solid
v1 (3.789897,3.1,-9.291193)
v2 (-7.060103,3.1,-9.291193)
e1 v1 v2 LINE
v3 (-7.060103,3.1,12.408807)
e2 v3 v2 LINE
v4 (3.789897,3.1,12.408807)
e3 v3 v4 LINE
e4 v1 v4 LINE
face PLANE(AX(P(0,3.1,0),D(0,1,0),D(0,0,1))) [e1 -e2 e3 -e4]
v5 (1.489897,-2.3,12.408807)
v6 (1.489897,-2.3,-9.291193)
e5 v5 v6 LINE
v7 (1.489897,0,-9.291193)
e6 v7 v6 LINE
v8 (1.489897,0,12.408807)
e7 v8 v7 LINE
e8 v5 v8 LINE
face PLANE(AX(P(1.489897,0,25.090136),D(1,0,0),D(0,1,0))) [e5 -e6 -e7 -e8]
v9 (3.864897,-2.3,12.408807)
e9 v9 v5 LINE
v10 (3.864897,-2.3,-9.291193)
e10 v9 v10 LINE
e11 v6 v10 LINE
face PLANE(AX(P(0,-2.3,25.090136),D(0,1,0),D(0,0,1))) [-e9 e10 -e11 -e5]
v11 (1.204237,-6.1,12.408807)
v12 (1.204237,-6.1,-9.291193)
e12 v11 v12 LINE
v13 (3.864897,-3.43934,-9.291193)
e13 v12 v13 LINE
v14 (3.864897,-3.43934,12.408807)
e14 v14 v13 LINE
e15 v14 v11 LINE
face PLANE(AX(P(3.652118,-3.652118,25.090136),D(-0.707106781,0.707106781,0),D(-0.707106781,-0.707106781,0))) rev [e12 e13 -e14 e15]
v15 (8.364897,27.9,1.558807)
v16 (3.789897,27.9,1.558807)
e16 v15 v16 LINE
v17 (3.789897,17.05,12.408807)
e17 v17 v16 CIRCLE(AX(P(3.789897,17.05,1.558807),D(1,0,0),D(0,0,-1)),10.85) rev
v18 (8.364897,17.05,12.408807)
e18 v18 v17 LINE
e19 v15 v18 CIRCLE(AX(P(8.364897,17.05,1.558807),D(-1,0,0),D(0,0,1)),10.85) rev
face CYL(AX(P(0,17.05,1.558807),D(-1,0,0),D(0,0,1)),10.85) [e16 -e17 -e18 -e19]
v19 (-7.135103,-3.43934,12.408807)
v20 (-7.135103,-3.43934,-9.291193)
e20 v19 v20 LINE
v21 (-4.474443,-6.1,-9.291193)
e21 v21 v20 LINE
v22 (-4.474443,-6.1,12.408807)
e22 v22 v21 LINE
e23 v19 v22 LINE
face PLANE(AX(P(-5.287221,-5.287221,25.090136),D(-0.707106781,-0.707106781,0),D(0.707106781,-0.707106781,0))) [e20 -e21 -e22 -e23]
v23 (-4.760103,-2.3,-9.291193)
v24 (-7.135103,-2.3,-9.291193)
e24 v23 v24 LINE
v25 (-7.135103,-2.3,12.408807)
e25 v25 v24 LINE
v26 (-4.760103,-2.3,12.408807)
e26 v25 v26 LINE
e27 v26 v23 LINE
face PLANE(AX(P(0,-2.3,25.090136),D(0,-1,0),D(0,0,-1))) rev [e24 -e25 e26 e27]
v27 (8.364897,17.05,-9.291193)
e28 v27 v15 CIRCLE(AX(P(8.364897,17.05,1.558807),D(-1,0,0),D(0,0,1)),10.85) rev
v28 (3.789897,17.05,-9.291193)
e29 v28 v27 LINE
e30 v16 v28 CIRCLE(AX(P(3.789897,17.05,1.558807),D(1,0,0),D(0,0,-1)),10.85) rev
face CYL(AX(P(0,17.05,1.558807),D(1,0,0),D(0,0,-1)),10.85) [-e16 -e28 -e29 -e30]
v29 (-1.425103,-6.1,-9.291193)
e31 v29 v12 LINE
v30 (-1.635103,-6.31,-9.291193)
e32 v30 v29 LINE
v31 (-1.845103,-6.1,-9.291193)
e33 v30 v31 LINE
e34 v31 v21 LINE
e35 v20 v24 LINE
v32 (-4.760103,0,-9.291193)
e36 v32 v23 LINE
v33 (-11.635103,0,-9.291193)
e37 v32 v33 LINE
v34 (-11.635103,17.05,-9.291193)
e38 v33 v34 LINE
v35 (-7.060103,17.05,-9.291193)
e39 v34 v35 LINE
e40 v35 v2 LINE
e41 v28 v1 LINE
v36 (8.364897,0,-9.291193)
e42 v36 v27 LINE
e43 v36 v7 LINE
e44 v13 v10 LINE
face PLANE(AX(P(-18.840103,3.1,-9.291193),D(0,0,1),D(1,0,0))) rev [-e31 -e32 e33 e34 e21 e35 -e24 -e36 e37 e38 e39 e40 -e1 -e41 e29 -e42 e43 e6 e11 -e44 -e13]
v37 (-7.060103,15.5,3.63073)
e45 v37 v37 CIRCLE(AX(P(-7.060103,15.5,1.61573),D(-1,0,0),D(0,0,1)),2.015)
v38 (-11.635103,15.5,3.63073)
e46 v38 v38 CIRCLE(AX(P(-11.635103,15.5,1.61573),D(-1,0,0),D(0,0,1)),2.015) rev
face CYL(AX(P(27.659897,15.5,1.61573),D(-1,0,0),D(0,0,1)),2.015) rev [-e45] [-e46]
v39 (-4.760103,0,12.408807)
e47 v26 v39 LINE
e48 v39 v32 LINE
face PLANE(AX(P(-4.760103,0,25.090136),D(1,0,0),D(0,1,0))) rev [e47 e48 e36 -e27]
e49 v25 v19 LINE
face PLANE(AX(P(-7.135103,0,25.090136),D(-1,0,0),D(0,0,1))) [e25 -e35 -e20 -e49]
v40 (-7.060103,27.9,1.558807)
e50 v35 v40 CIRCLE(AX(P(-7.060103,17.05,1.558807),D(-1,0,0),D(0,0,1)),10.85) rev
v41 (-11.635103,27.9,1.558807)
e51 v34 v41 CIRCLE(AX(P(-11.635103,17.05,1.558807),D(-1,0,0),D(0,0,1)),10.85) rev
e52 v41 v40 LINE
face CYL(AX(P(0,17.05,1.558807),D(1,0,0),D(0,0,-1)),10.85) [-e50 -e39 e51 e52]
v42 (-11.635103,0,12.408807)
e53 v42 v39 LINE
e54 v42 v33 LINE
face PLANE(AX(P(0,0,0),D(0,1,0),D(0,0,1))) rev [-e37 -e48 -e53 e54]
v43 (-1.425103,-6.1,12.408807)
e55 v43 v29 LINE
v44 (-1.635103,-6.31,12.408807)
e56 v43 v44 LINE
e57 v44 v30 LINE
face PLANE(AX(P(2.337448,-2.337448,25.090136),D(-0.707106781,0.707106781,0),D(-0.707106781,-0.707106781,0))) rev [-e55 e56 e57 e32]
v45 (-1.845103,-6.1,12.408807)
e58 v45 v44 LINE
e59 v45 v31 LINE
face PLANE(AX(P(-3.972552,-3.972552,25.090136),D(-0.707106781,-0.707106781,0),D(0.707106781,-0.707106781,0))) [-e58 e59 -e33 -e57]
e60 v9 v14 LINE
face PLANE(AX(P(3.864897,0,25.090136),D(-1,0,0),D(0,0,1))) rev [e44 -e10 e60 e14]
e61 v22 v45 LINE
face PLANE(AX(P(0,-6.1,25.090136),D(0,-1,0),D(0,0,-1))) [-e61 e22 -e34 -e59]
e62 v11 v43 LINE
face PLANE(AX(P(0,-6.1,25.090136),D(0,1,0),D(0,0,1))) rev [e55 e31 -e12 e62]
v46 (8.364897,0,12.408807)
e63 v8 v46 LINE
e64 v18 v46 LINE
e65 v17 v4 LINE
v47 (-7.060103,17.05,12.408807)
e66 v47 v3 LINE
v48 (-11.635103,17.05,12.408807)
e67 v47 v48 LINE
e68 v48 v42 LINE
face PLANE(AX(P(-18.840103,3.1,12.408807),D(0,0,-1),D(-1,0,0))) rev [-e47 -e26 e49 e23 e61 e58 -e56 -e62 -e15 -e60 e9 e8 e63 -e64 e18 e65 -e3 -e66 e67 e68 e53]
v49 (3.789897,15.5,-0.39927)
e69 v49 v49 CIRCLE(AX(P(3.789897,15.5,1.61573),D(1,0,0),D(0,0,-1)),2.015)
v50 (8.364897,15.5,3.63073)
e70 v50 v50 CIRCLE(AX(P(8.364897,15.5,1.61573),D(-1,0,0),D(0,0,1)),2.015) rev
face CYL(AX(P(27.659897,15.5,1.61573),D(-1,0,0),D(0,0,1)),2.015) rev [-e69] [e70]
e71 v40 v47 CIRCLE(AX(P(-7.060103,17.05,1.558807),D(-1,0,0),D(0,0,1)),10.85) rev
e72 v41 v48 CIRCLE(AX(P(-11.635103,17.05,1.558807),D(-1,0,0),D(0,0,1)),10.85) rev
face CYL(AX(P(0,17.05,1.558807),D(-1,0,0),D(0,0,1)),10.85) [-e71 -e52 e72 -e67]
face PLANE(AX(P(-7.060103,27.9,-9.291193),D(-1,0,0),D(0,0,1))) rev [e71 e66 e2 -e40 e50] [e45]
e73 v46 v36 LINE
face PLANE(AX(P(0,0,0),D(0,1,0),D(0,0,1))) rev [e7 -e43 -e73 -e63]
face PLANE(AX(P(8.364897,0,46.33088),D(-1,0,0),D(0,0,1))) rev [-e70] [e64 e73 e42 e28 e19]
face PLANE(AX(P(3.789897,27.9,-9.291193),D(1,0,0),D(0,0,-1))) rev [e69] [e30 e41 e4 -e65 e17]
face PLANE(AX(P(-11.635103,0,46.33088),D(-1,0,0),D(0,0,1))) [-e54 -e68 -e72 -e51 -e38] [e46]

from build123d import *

# Parameters (mm, degrees)
SKETCH1_W           = 150
SKETCH1_H           = 70
BOSS_EXTRUDE1_DEPTH = 10
SKETCH2_W           = 18
SKETCH2_H           = 70
BOSS_EXTRUDE2_DEPTH = 80
FILLET1_R           = 35
SKETCH3_R           = 6.5
CUT_EXTRUDE1_DEPTH  = 164.102034121
RIB1_REACH          = 134.904
SKETCH5_WALL_W      = 321.142477346
SKETCH5_WALL_H      = 40
SKETCH7_W           = 43.830511012
SKETCH7_H           = 10.028409091
CUT_EXTRUDE2_DEPTH  = 80
SCALE1_SCALE        = 0.31
BOSS_EXTRUDE4_DEPTH = 21.7
CUT_EXTRUDE5_REACH  = 46.882
SKETCH11_W          = 1.005
SKETCH11_H          = 10.85
SKETCH11_H_2        = 13.95


with BuildPart() as part:
    # Sketch1 → Boss-Extrude1 (new body)
    with BuildSketch(Plane(origin=(0, 0, 0), x_dir=(1, 0, 0), z_dir=(0, 1, 0))):
        with Locations((14.225473782, -5.028409091)):
            Rectangle(SKETCH1_W, SKETCH1_H)
    extrude(amount=BOSS_EXTRUDE1_DEPTH)

    # Sketch2 → Boss-Extrude2 (add)
    with BuildSketch(Plane(origin=(0, 10, 0), x_dir=(1, 0, 0), z_dir=(0, 1, 0))):
        with Locations((-31.774526218, -5.028409091)):
            Rectangle(SKETCH2_W, SKETCH2_H)
        with Locations((21.225473782, -5.028409091)):
            Rectangle(SKETCH2_W, SKETCH2_H)
    extrude(amount=BOSS_EXTRUDE2_DEPTH)

    # Fillet1
    fillet1_edges = [part.edges().sort_by_distance(p)[0] for p in [
        (21.225473782, 90, 40.028409091),
        (21.225473782, 90, -29.971590909),
        (-31.774526218, 90, -29.971590909),
        (-31.774526218, 90, 40.028409091),
    ]]
    fillet(fillet1_edges, radius=FILLET1_R - 0.0001)  # a hair under: the kernel refuses the full size

    # Sketch3 → Cut-Extrude1 (cut, through all)
    with BuildSketch(Plane.ZY.offset(40.774526218)):
        with Locations((5.212032143, 50)):
            Circle(SKETCH3_R)
    extrude(amount=-CUT_EXTRUDE1_DEPTH, mode=Mode.SUBTRACT)

    # Sketch5 wall → Rib1 (add, up to next)
    with BuildSketch(Plane(origin=(52.140729288, 25.194278726, 0), x_dir=(0.821802771323, -0.569772064116, 0), z_dir=(0.569772064116, 0.821802771323, 0)), mode=Mode.PRIVATE) as rib1_sk1:
        Rectangle(SKETCH5_WALL_W, SKETCH5_WALL_H)
    rib1_tool1 = extrude(rib1_sk1.sketch, amount=-RIB1_REACH, mode=Mode.PRIVATE) - part.part
    add(rib1_tool1.solids().sort_by_distance((52.140729288, 25.194278726, 0))[0])

    # Sketch7 → Cut-Extrude2 (cut)
    with BuildSketch(Plane(origin=(0, 10, 0), x_dir=(1, 0, 0), z_dir=(0, 1, 0))):
        with Locations((52.140729288, 14.985795454)):
            Rectangle(SKETCH7_W, SKETCH7_H)
    extrude(amount=CUT_EXTRUDE2_DEPTH, mode=Mode.SUBTRACT)


with BuildPart() as part_1:
    # Scale1: scaled about (0, 0, 0)
    add(part.part.scale(SCALE1_SCALE))

    # Sketch10 → Boss-Extrude4 (add)
    with BuildSketch(Plane(origin=(0, 0, -9.291193182), x_dir=(-1, 0, 0), z_dir=(0, 0, -1))):
        Polygon((4.760103128, -1.455), (4.760103128, 0), (-1.489896872, 0), (-1.489896872, -1.455), (-1.489896872, -1.8), (-1.489896872, -2.3), (-3.864896872, -2.3), (-3.864896872, -3.439339828), (-1.204236701, -6.1), (1.425103128, -6.1), (1.635103128, -6.31), (1.845103128, -6.1), (4.474442956, -6.1), (7.135103128, -3.439339828), (7.135103128, -2.3), (4.760103128, -2.3), (4.760103128, -1.8), align=None)
    extrude(amount=-BOSS_EXTRUDE4_DEPTH)

    # Sketch11 → Cut-Extrude5 (cut, up to next)
    with BuildSketch(Plane(origin=(0, 0, -9.291193182), x_dir=(-1, 0, 0), z_dir=(0, 0, -1)), mode=Mode.PRIVATE) as cut_extrude5_sk1:
        Polygon((-9.369896872, 3.1), (-8.364896872, 3.1), (-8.364896872, 17.05), (-9.369896872, 17.05), (-9.369896872, 12.52045281), align=None)
    cut_extrude5_tool1 = extrude(cut_extrude5_sk1.sketch, amount=-CUT_EXTRUDE5_REACH, mode=Mode.PRIVATE) & part_1.part
    # Sketch11 → Cut-Extrude5 (cut, up to next)
    with BuildSketch(Plane(origin=(0, 0, -9.291193182), x_dir=(-1, 0, 0), z_dir=(0, 0, -1)), mode=Mode.PRIVATE) as cut_extrude5_sk2:
        with Locations((-8.867396872, 22.475)):
            Rectangle(SKETCH11_W, SKETCH11_H)
    cut_extrude5_tool2 = extrude(cut_extrude5_sk2.sketch, amount=-CUT_EXTRUDE5_REACH, mode=Mode.PRIVATE) & part_1.part
    # Sketch11 → Cut-Extrude5 (cut, up to next)
    with BuildSketch(Plane(origin=(0, 0, -9.291193182), x_dir=(-1, 0, 0), z_dir=(0, 0, -1)), mode=Mode.PRIVATE) as cut_extrude5_sk3:
        Polygon((-22.957355286, 3.1), (-9.369896872, 3.1), (-9.369896872, 12.52045281), align=None)
    cut_extrude5_tool3 = extrude(cut_extrude5_sk3.sketch, amount=-CUT_EXTRUDE5_REACH, mode=Mode.PRIVATE) & part_1.part
    # Sketch11 → Cut-Extrude5 (cut, up to next)
    with BuildSketch(Plane(origin=(0, 0, -9.291193182), x_dir=(-1, 0, 0), z_dir=(0, 0, -1)), mode=Mode.PRIVATE) as cut_extrude5_sk4:
        Polygon((-8.364896872, 0), (-8.364896872, 3.1), (-9.369896872, 3.1), (-22.957355286, 3.1), (-27.659896872, 3.1), (-27.659896872, 0), align=None)
    cut_extrude5_tool4 = extrude(cut_extrude5_sk4.sketch, amount=-CUT_EXTRUDE5_REACH, mode=Mode.PRIVATE) & part_1.part
    # Sketch11 → Cut-Extrude5 (cut, up to next)
    with BuildSketch(Plane(origin=(0, 0, -9.291193182), x_dir=(-1, 0, 0), z_dir=(0, 0, -1)), mode=Mode.PRIVATE) as cut_extrude5_sk5:
        with Locations((12.137603128, 10.075)):
            Rectangle(SKETCH11_W, SKETCH11_H_2)
    cut_extrude5_tool5 = extrude(cut_extrude5_sk5.sketch, amount=-CUT_EXTRUDE5_REACH, mode=Mode.PRIVATE) & part_1.part
    # Sketch11 → Cut-Extrude5 (cut, up to next)
    with BuildSketch(Plane(origin=(0, 0, -9.291193182), x_dir=(-1, 0, 0), z_dir=(0, 0, -1)), mode=Mode.PRIVATE) as cut_extrude5_sk6:
        with Locations((12.137603128, 22.475)):
            Rectangle(SKETCH11_W, SKETCH11_H)
    cut_extrude5_tool6 = extrude(cut_extrude5_sk6.sketch, amount=-CUT_EXTRUDE5_REACH, mode=Mode.PRIVATE) & part_1.part
    # Sketch11 → Cut-Extrude5 (cut, up to next)
    with BuildSketch(Plane(origin=(0, 0, -9.291193182), x_dir=(-1, 0, 0), z_dir=(0, 0, -1)), mode=Mode.PRIVATE) as cut_extrude5_sk7:
        Polygon((12.640103128, 3.1), (11.635103128, 3.1), (11.635103128, 0), (18.840103128, 0), (18.840103128, 3.1), align=None)
    cut_extrude5_tool7 = extrude(cut_extrude5_sk7.sketch, amount=-CUT_EXTRUDE5_REACH, mode=Mode.PRIVATE) & part_1.part
    add(cut_extrude5_tool1.solids().sort_by_distance((8.867397, 10.075, -9.291193))[0], mode=Mode.SUBTRACT)
    add(cut_extrude5_tool2.solids().sort_by_distance((8.867397, 22.475, -9.291193))[0], mode=Mode.SUBTRACT)
    add(cut_extrude5_tool3.solids().sort_by_distance((13.89905, 6.240151, -9.291193))[0], mode=Mode.SUBTRACT)
    add(cut_extrude5_tool4.solids().sort_by_distance((18.012397, 1.55, -9.291193))[0], mode=Mode.SUBTRACT)
    add(cut_extrude5_tool5.solids().sort_by_distance((-12.137603, 10.075, -9.291193))[0], mode=Mode.SUBTRACT)
    add(cut_extrude5_tool6.solids().sort_by_distance((-12.137603, 22.475, -9.291193))[0], mode=Mode.SUBTRACT)
    add(cut_extrude5_tool7.solids().sort_by_distance((-15.237603, 1.55, -9.291193))[0], mode=Mode.SUBTRACT)


solid = part_1.part
